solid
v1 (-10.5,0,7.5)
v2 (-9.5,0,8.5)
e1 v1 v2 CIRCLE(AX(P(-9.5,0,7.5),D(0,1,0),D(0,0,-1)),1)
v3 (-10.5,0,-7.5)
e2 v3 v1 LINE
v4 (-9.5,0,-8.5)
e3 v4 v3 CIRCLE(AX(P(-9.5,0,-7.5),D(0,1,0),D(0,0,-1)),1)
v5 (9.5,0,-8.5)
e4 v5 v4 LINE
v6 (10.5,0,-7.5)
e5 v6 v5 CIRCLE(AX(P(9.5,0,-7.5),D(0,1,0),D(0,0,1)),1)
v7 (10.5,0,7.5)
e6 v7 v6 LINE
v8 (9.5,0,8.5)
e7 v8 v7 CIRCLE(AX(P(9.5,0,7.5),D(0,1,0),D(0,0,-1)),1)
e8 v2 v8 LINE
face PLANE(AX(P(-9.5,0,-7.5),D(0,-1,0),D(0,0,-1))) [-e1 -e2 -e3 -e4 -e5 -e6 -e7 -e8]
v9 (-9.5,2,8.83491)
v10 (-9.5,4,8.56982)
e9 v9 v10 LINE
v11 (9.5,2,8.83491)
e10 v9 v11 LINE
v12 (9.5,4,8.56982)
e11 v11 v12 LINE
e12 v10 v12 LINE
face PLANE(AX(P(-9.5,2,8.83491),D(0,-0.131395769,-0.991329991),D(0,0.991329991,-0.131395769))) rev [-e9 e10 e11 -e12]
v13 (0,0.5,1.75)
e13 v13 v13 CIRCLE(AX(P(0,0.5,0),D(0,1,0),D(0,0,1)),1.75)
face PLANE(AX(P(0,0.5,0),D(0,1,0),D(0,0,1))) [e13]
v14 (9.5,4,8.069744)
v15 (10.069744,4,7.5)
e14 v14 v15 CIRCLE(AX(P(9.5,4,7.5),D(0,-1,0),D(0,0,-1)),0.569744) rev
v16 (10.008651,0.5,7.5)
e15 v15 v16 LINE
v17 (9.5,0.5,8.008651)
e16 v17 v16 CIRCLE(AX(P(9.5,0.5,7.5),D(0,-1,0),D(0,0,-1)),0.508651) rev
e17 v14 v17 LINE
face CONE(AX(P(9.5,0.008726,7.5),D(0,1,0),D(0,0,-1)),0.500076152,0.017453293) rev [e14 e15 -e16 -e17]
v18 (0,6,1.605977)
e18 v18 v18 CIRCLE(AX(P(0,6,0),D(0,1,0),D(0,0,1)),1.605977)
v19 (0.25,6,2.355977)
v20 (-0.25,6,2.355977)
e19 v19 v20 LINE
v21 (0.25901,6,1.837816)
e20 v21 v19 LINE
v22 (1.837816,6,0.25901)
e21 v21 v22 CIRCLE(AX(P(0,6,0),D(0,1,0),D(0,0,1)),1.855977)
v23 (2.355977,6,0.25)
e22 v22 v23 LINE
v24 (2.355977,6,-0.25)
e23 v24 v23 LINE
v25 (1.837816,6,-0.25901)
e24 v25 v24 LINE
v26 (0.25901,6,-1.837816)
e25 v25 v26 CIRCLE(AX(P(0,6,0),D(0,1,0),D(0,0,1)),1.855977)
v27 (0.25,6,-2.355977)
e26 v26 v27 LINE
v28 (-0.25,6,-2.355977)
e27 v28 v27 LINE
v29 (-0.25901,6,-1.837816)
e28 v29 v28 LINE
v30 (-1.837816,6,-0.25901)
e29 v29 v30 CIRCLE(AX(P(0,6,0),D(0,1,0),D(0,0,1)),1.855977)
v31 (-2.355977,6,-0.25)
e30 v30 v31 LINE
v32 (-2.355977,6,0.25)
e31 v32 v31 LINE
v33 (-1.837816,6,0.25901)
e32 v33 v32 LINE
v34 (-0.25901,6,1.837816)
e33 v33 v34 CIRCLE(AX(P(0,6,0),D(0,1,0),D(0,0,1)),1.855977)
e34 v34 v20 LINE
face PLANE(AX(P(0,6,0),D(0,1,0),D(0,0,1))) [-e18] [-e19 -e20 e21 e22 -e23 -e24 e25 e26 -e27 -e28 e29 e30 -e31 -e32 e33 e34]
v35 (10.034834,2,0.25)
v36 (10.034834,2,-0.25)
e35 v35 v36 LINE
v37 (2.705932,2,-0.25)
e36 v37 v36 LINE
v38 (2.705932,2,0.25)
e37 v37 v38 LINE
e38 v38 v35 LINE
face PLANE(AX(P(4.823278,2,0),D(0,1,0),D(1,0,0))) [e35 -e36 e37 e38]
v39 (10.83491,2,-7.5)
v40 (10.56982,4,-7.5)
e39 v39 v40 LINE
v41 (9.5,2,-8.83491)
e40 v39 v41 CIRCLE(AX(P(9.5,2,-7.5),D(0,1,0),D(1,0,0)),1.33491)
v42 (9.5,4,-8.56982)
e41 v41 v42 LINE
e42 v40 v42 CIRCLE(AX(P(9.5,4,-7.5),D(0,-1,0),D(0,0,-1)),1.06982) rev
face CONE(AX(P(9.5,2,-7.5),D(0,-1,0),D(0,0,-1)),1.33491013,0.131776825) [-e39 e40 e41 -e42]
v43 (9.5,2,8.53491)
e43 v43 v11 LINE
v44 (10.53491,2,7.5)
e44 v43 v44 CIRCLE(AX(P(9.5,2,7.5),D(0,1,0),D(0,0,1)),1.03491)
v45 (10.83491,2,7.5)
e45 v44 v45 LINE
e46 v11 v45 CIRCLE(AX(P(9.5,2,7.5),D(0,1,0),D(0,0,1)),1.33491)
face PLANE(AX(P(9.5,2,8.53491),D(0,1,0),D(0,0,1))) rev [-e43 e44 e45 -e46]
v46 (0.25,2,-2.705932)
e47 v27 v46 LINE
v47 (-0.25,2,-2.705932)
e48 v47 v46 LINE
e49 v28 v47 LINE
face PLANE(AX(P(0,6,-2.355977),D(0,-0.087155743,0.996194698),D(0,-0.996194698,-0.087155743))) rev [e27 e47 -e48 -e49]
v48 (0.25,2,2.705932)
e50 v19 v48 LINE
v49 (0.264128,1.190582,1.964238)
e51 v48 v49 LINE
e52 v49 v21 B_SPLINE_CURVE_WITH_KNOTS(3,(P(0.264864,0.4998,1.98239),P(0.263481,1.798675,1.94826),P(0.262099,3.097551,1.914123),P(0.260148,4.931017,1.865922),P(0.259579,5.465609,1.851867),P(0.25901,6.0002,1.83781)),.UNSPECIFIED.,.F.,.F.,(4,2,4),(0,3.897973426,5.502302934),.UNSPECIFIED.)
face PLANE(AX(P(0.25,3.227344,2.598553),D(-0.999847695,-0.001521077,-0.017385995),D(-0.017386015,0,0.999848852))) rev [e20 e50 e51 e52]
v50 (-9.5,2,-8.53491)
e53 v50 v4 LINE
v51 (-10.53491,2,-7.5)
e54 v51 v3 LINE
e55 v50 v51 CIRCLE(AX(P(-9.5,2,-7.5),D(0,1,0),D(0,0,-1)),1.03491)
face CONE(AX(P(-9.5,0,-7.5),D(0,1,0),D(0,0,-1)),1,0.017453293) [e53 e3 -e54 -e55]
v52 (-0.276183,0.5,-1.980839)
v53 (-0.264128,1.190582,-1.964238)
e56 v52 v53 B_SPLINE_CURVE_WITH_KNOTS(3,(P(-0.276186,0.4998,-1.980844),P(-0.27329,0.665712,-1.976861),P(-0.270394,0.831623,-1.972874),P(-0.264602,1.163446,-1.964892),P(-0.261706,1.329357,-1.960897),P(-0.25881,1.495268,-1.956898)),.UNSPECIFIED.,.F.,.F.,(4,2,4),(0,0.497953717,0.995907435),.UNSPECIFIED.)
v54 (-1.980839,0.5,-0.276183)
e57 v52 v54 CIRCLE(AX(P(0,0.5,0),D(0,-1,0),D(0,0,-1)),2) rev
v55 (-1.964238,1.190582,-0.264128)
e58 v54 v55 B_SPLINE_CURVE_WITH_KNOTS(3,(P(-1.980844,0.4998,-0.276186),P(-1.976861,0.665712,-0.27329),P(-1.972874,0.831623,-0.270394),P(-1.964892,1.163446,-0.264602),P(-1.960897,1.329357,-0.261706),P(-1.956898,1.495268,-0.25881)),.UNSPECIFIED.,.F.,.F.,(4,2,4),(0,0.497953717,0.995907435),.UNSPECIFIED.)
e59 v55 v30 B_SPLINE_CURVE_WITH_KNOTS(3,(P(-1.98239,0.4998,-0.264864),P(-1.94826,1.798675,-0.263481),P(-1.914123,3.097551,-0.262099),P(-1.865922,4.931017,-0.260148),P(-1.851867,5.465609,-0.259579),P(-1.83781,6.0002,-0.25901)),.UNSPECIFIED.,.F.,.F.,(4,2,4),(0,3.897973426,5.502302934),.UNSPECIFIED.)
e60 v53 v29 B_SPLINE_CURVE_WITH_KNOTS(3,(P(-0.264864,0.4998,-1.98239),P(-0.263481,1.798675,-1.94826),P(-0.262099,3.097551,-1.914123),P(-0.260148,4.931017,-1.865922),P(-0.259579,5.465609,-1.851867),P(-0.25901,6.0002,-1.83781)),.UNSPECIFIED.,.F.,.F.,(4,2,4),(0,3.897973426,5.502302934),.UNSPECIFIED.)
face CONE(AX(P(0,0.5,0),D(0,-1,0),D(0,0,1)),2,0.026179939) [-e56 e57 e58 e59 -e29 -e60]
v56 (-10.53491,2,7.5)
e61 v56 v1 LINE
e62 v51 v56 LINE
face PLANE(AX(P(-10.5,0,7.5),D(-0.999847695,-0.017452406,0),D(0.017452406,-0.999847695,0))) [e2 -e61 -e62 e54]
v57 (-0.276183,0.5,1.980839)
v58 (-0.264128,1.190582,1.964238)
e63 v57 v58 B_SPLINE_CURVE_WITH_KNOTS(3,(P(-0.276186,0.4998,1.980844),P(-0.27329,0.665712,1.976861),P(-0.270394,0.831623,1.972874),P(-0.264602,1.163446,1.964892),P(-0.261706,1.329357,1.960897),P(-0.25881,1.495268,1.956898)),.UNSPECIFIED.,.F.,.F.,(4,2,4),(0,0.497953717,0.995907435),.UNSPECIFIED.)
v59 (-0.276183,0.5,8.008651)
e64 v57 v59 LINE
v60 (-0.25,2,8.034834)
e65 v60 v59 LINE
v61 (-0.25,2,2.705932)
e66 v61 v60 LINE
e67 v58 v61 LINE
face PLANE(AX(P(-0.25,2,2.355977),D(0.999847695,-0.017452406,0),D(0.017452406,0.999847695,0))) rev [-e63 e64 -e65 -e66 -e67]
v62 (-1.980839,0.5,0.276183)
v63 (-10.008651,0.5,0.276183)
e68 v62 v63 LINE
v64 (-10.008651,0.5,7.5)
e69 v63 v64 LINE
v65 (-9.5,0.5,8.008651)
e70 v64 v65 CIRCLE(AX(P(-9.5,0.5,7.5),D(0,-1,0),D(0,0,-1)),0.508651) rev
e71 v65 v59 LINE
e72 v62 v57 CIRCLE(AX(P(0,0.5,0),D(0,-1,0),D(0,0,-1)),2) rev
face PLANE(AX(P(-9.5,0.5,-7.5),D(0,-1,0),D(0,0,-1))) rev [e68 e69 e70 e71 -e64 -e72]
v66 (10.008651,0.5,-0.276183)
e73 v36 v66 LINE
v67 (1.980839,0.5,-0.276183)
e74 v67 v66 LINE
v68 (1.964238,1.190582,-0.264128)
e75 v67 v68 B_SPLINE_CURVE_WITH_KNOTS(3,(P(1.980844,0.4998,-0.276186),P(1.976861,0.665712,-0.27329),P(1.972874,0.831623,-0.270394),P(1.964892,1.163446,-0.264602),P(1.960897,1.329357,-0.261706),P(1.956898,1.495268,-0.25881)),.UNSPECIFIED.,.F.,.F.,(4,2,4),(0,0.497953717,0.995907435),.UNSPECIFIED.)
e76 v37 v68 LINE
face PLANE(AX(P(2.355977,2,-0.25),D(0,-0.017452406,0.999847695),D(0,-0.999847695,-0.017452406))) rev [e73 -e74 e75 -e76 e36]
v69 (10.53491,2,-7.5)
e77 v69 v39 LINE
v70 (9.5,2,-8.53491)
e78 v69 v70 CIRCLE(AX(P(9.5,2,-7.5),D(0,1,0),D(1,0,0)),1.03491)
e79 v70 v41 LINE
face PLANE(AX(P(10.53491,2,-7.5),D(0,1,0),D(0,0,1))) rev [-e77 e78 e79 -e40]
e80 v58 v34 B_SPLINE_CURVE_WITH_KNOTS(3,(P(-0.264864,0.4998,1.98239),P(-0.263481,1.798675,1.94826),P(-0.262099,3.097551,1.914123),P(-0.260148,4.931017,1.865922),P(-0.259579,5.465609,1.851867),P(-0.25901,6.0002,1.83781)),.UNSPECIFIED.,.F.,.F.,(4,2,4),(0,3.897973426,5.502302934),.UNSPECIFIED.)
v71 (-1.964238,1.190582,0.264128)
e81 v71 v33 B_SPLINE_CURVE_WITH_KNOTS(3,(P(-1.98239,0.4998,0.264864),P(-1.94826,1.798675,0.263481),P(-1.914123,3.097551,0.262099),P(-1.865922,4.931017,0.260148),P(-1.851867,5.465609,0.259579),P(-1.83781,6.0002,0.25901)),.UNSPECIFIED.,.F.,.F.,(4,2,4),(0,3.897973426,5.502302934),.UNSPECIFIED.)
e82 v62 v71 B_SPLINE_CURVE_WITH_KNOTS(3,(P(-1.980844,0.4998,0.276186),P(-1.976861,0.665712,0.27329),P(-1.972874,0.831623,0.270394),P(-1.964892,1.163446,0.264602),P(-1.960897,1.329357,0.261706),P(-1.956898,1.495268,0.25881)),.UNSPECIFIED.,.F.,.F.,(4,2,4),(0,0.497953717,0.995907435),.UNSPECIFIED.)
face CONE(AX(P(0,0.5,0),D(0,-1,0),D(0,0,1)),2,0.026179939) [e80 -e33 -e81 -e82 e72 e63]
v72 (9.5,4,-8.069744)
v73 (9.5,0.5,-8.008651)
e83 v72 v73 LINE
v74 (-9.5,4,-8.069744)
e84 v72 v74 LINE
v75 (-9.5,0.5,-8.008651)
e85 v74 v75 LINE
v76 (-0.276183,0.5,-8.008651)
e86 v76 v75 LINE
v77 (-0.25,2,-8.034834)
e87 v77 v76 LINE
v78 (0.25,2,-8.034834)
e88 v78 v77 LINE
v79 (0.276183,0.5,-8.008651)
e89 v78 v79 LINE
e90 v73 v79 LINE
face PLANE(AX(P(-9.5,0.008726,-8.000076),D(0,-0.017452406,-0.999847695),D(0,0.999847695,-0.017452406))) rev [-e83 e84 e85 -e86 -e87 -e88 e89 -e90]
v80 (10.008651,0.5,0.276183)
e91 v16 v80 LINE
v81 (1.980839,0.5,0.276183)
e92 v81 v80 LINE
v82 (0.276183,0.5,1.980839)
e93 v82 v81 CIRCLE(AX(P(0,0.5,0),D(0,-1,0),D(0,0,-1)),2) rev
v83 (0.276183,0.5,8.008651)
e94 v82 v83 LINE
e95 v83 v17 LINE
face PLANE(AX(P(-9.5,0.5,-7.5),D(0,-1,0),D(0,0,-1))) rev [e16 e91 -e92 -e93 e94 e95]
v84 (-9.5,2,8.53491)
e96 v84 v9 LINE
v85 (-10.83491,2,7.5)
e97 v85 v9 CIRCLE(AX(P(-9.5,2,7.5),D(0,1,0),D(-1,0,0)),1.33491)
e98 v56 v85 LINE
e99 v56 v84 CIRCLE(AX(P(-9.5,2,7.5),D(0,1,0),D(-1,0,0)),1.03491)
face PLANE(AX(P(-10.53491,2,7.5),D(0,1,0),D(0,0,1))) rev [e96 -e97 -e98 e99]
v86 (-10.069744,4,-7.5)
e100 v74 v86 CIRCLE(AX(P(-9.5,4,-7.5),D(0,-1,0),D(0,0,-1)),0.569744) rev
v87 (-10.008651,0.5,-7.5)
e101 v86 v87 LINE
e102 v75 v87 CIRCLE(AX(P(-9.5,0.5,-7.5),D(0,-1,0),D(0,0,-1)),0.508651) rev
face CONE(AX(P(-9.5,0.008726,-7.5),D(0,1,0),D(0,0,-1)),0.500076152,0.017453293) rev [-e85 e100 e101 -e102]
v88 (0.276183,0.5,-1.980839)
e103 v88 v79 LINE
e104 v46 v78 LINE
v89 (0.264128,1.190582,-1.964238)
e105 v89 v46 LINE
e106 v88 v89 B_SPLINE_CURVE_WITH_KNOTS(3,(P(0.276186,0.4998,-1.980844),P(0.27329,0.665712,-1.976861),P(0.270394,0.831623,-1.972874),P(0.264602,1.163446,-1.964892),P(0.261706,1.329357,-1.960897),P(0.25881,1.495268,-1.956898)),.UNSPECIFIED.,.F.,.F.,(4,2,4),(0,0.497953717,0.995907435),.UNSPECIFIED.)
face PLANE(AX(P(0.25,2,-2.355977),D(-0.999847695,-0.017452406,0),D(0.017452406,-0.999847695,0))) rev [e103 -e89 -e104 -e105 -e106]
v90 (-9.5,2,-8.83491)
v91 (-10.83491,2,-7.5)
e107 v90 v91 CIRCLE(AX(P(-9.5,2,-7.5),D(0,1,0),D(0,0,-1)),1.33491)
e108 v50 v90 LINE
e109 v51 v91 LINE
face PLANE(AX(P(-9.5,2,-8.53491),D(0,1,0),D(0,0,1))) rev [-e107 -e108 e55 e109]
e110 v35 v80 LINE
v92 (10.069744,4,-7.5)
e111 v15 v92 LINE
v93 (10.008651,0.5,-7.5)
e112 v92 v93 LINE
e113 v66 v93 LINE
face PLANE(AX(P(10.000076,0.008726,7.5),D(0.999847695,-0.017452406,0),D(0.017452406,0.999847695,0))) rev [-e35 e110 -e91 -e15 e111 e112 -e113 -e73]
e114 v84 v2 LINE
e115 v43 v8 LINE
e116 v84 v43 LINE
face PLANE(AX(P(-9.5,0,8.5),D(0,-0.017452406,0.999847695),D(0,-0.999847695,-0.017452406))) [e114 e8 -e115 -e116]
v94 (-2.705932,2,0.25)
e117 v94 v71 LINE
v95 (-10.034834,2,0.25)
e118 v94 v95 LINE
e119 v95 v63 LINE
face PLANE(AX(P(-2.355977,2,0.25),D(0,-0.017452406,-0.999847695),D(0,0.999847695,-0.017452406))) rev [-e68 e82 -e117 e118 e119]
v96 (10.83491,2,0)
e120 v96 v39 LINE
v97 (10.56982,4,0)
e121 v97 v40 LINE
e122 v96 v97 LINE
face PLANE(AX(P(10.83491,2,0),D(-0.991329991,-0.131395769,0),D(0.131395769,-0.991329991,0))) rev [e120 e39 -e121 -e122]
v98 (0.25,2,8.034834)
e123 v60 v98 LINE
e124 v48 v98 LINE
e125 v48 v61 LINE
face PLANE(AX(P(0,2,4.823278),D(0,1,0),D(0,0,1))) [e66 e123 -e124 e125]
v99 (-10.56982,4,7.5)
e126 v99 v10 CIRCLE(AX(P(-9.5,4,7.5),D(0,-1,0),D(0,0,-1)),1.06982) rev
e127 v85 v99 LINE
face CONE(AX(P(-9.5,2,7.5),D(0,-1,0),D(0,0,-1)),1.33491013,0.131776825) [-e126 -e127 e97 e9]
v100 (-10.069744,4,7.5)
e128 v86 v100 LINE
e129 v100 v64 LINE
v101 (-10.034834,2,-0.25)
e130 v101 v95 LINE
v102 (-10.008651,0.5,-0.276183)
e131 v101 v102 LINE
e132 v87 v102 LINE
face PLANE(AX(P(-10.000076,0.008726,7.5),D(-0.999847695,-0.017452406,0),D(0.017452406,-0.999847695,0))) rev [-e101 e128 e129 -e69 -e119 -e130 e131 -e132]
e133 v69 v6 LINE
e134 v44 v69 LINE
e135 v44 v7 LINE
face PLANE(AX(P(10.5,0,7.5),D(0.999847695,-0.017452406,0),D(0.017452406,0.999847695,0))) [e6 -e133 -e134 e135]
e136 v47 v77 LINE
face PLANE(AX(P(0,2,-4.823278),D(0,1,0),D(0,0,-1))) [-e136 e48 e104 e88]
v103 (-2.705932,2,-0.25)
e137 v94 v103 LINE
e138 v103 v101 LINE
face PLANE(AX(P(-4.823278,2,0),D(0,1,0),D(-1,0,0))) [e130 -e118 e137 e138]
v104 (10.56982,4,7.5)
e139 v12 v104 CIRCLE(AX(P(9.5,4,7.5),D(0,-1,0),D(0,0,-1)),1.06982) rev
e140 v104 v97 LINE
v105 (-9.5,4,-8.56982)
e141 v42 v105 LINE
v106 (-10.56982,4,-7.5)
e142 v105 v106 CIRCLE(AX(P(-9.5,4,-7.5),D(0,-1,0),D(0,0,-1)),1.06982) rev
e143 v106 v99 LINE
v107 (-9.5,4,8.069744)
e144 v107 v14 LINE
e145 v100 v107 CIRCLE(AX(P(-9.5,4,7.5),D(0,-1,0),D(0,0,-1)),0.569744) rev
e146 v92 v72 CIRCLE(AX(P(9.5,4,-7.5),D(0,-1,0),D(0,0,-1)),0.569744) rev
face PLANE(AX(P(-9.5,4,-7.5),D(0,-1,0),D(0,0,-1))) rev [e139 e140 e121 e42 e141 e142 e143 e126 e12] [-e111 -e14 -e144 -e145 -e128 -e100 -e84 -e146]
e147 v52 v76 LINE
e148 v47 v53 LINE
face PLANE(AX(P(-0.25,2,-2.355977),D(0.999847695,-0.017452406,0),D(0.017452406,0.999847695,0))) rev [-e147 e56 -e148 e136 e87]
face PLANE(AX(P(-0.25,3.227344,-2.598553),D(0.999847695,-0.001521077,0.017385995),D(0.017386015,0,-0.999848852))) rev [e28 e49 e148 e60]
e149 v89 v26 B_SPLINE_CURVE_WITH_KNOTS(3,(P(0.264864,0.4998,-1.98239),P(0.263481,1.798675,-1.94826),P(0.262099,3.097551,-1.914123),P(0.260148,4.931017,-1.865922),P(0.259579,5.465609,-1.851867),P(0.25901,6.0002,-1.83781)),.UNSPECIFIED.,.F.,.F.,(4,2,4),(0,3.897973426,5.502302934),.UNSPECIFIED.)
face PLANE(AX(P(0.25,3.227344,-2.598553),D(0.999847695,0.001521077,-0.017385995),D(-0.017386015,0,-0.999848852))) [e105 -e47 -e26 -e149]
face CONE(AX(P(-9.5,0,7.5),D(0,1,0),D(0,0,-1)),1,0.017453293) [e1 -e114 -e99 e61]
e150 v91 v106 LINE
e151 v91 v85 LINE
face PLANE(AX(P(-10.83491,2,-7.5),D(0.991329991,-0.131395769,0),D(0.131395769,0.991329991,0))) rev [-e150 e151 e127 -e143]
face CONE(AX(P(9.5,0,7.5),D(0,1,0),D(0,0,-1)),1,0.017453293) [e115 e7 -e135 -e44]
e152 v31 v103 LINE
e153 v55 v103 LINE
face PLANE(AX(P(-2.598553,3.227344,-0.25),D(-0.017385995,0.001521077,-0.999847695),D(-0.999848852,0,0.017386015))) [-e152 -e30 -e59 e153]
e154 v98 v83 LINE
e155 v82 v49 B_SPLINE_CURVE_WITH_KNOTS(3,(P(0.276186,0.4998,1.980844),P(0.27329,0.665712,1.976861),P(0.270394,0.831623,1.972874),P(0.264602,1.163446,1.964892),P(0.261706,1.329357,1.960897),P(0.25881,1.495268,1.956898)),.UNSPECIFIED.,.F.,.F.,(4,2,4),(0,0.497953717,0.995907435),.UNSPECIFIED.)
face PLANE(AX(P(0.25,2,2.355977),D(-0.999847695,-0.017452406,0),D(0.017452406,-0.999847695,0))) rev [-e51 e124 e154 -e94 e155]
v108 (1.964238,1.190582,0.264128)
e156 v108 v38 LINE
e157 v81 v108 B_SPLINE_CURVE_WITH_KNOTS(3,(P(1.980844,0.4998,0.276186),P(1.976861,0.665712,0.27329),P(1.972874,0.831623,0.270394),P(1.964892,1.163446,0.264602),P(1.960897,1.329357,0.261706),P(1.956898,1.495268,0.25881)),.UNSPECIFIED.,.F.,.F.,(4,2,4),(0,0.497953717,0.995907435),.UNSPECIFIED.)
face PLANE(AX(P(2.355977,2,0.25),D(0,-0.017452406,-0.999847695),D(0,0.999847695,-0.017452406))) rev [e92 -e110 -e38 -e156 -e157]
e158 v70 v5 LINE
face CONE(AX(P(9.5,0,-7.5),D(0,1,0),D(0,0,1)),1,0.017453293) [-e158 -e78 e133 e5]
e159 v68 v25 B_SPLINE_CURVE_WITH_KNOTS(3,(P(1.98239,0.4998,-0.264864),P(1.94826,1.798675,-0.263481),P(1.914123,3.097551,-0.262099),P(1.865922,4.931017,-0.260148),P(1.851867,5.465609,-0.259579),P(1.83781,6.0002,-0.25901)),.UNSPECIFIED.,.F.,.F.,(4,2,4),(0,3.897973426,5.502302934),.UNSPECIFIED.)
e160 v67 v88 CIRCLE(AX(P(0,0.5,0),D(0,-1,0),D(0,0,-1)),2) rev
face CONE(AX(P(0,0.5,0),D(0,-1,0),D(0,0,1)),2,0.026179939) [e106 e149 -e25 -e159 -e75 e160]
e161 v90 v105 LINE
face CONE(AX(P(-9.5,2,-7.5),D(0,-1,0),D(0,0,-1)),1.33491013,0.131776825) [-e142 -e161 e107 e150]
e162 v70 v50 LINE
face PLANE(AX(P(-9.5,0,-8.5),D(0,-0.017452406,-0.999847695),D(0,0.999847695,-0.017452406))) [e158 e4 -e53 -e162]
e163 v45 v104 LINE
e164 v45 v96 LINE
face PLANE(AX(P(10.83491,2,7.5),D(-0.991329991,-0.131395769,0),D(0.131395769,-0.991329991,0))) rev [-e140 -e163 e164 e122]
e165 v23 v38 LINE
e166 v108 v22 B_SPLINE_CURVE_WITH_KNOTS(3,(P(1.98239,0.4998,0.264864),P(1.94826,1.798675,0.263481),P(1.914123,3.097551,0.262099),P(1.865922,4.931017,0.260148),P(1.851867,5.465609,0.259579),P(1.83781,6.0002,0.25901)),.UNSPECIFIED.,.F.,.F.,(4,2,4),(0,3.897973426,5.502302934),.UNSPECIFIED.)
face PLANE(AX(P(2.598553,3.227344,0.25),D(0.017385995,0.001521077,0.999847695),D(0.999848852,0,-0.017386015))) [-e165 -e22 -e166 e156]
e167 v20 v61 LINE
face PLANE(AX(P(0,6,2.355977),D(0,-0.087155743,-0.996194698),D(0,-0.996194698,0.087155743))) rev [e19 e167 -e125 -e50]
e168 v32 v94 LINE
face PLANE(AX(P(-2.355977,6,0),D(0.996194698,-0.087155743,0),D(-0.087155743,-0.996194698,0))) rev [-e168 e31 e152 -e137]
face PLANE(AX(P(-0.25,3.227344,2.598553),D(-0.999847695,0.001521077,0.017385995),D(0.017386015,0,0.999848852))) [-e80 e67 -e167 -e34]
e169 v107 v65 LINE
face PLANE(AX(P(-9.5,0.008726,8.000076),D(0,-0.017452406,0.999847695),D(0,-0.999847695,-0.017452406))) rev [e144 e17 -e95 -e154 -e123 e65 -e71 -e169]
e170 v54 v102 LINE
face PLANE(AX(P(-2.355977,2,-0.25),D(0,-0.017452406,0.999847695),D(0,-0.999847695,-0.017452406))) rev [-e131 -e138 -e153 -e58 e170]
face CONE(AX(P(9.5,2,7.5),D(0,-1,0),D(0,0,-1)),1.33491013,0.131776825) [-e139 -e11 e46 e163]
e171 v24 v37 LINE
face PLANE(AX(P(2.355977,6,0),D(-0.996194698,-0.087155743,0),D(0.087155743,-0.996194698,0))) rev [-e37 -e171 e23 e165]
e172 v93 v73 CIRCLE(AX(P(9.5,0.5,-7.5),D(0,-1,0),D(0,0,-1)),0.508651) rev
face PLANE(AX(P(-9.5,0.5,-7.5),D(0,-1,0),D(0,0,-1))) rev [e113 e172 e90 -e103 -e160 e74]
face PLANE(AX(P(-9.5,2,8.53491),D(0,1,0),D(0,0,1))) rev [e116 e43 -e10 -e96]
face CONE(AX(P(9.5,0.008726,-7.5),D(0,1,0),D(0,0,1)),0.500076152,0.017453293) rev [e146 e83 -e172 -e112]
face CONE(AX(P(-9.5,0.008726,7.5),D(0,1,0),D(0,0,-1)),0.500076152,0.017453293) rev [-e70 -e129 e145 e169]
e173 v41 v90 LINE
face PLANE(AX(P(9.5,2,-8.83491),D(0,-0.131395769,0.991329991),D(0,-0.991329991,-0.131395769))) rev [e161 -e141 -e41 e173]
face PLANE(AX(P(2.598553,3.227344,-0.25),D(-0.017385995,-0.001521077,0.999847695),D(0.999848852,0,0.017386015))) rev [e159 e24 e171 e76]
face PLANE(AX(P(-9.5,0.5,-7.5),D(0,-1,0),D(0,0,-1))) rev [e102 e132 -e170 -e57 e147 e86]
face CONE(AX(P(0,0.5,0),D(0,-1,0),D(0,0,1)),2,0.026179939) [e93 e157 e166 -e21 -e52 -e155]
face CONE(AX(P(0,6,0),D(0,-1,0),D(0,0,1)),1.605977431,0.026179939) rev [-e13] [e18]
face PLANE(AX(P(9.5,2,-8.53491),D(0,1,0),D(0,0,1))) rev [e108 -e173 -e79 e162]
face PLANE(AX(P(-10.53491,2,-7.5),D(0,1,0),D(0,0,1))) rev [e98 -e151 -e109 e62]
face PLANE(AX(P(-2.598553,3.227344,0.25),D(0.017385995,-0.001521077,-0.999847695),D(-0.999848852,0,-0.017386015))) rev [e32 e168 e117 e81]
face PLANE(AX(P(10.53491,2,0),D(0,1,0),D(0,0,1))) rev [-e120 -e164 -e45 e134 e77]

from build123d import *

# Parameters (mm, degrees)
BOSS_EXTRUDE1_DEPTH = 4
BOSS_EXTRUDE1_DRAFT = -1
SHELL1_T            = -0.5
SKETCH2_R           = 2
BOSS_EXTRUDE2_DEPTH = 5.5
BOSS_EXTRUDE2_TAPER = 1.5
CIRPATTERN1_COUNT   = 4
SKETCH4_R           = 1.605977431
CUT_EXTRUDE1_DEPTH  = 5.5
CUT_EXTRUDE1_DRAFT  = 1.5
RIB2_START          = -10.069744096
RIB2_DEPTH          = 8.231928651
RIB2_START_2        = 1.837815445
RIB2_2_DEPTH        = 8.231928651
RIB2_START_3        = -8.069744096
RIB2_3_DEPTH        = 6.231928651
RIB2_4_DEPTH        = 6.231928651


with BuildPart() as part:
    # Sketch1 → Boss-Extrude1 (with draft: the straight prism first)
    with BuildSketch(Plane(origin=(0, 0, 0), x_dir=(1, 0, 0), z_dir=(0, 1, 0))):
        with BuildLine():
            Line((-9.5, -8.5), (9.5, -8.5))
            ThreePointArc((9.5, -8.5), (10.207106781, -8.207106781), (10.5, -7.5))
            Line((10.5, -7.5), (10.5, 7.5))
            ThreePointArc((10.5, 7.5), (10.207106781, 8.207106781), (9.5, 8.5))
            Line((9.5, 8.5), (-9.5, 8.5))
            ThreePointArc((-9.5, 8.5), (-10.207106781, 8.207106781), (-10.5, 7.5))
            Line((-10.5, 7.5), (-10.5, -7.5))
            ThreePointArc((-10.5, -7.5), (-10.207106781, -8.207106781), (-9.5, -8.5))
        make_face()
    extrude(amount=BOSS_EXTRUDE1_DEPTH)
    # Boss-Extrude1: the draft: its side faces are tilted about the plane it starts from
    boss_extrude1_sides = [part.faces().sort_by_distance(p)[0] for p in [
        (0, 2, 8.5),
        (10.207106781, 2, 8.207106781),
        (10.5, 2, 0),
        (10.207106781, 2, -8.207106781),
        (0, 2, -8.5),
        (-10.207106781, 2, -8.207106781),
        (-10.5, 2, 0),
        (-10.207106781, 2, 8.207106781),
    ]]
    draft(boss_extrude1_sides, Plane(origin=(0, 0, 0), x_dir=(1, 0, 0), z_dir=(0, 1, 0)), BOSS_EXTRUDE1_DRAFT)

    # Shell1
    shell1_openings = [part.faces().sort_by_distance(p)[0] for p in [
        (0, 4, 0),
    ]]
    offset(amount=SHELL1_T, openings=shell1_openings, kind=Kind.INTERSECTION)

    # Sketch2 → Boss-Extrude2 (add)
    with BuildSketch(Plane(origin=(0, 0.5, 0), x_dir=(1, 0, 0), z_dir=(0, 1, 0))):
        Circle(SKETCH2_R)
    extrude(amount=BOSS_EXTRUDE2_DEPTH, taper=BOSS_EXTRUDE2_TAPER)

    # Rib1: read off the stored shape, not the designer's step
    # Rib1: loft between two sections, ruled curve by curve
    rib1_from = [
        Edge.make_line((1.837815545, 6, 0.259010132), (2.355977431, 6, 0.25)),
        Edge.make_line((1.837815545, 6, -0.259010132), (2.355977431, 6, -0.25)),
        Edge.make_line((2.355977431, 6, -0.25), (2.355977431, 6, 0.25)),
        Edge.make_line((1.837815545, 6, -0.259010132), (1.837815545, 6, 0.259010132)),
    ]
    rib1_to = [
        Edge.make_line((1.982384256, 0.5, 0.264863479), (2.837165081, 0.5, 0.25)),
        Edge.make_line((1.982384256, 0.5, -0.264863479), (2.837165081, 0.5, -0.25)),
        Edge.make_line((2.837165081, 0.5, -0.25), (2.837165081, 0.5, 0.25)),
        Edge.make_line((1.982384256, 0.5, -0.264863479), (1.982384256, 0.5, 0.264863479)),
    ]
    rib1 = Solid(Shell([*[Face.make_surface_from_curves(rib1_from[k], rib1_to[k]) for k in range(4)], Face(Wire(rib1_from)), Face(Wire(rib1_to))]))
    add(rib1)

    # CirPattern1: Rib1 ×4 about axis
    cirpattern1_axis = Axis((0, 0, 0), (0, 1, 0))
    for i in range(1, CIRPATTERN1_COUNT):
        add(rib1.rotate(cirpattern1_axis, i * 360 / CIRPATTERN1_COUNT))


with BuildPart() as cut_extrude1_tool:
    # Sketch4 → Cut-Extrude1 (with draft: the straight prism first)
    with BuildSketch(Plane(origin=(0, 6, 0), x_dir=(1, 0, 0), z_dir=(0, 1, 0))):
        Circle(SKETCH4_R)
    extrude(amount=-CUT_EXTRUDE1_DEPTH)
    # Cut-Extrude1: the draft: its side faces are tilted about the plane it starts from
    cut_extrude1_sides = [cut_extrude1_tool.faces().sort_by_distance(p)[0] for p in [
        (-1.605977431, 3.25, 0),
    ]]
    draft(cut_extrude1_sides, Plane(origin=(0, 6, 0), x_dir=(1, 0, 0), z_dir=(0, 1, 0)), CUT_EXTRUDE1_DRAFT)


with BuildPart() as part_1:
    add(part.part)

    # Cut-Extrude1: cut by cut_extrude1_tool
    add(cut_extrude1_tool.part, mode=Mode.SUBTRACT)

    # Sweep1: sweep along a path in Sketch6
    with BuildLine(Plane(origin=(0, 2, 0), x_dir=(-1, 0, 0), z_dir=(0, -1, 0))) as sweep1_path:
        Line((-9.5, 8.56982026), (9.5, 8.56982026))
        ThreePointArc((9.5, 8.56982026), (10.25647716, 8.25647716), (10.56982026, 7.5))
        Line((10.56982026, 7.5), (10.56982026, -7.5))
        ThreePointArc((10.56982026, -7.5), (10.25647716, -8.25647716), (9.5, -8.56982026))
        Line((9.5, -8.56982026), (-9.5, -8.56982026))
        ThreePointArc((-9.5, -8.56982026), (-10.25647716, -8.25647716), (-10.56982026, -7.5))
        Line((-10.56982026, -7.5), (-10.56982026, 7.5))
        ThreePointArc((-10.56982026, 7.5), (-10.25647716, 8.25647716), (-9.5, 8.56982026))
    # Sketch5 → Sweep1 (sweep)
    with BuildSketch(Plane.XY):
        Polygon((10.56982026, 4), (10.53491013, 2), (10.83491013, 2), align=None)
    sweep(path=sweep1_path.line)

    # Rib2: read off the stored shape, not the designer's step
    # Rib2 outline → Rib2 (add)
    with BuildSketch(Plane.YZ.offset(RIB2_START)):
        Polygon((2, 0.25), (0.5, 0.276182597), (0.5, -0.276182597), (2, -0.25), align=None)
    extrude(amount=RIB2_DEPTH)

    # Rib2 2 outline → Rib2 2 (add)
    with BuildSketch(Plane.YZ.offset(RIB2_START_2)):
        Polygon((2, 0.25), (0.5, 0.276182597), (0.5, -0.276182597), (2, -0.25), align=None)
    extrude(amount=RIB2_2_DEPTH)

    # Rib2 3 outline → Rib2 3 (add)
    with BuildSketch(Plane.XY.offset(RIB2_START_3)):
        Polygon((0.276182597, 0.5), (0.25, 2), (-0.25, 2), (-0.276182597, 0.5), align=None)
    extrude(amount=RIB2_3_DEPTH)

    # Rib2 4 outline → Rib2 4 (add)
    with BuildSketch(Plane.XY.offset(RIB2_START_2)):
        Polygon((0.276182597, 0.5), (0.25, 2), (-0.25, 2), (-0.276182597, 0.5), align=None)
    extrude(amount=RIB2_4_DEPTH)


solid = part_1.part
